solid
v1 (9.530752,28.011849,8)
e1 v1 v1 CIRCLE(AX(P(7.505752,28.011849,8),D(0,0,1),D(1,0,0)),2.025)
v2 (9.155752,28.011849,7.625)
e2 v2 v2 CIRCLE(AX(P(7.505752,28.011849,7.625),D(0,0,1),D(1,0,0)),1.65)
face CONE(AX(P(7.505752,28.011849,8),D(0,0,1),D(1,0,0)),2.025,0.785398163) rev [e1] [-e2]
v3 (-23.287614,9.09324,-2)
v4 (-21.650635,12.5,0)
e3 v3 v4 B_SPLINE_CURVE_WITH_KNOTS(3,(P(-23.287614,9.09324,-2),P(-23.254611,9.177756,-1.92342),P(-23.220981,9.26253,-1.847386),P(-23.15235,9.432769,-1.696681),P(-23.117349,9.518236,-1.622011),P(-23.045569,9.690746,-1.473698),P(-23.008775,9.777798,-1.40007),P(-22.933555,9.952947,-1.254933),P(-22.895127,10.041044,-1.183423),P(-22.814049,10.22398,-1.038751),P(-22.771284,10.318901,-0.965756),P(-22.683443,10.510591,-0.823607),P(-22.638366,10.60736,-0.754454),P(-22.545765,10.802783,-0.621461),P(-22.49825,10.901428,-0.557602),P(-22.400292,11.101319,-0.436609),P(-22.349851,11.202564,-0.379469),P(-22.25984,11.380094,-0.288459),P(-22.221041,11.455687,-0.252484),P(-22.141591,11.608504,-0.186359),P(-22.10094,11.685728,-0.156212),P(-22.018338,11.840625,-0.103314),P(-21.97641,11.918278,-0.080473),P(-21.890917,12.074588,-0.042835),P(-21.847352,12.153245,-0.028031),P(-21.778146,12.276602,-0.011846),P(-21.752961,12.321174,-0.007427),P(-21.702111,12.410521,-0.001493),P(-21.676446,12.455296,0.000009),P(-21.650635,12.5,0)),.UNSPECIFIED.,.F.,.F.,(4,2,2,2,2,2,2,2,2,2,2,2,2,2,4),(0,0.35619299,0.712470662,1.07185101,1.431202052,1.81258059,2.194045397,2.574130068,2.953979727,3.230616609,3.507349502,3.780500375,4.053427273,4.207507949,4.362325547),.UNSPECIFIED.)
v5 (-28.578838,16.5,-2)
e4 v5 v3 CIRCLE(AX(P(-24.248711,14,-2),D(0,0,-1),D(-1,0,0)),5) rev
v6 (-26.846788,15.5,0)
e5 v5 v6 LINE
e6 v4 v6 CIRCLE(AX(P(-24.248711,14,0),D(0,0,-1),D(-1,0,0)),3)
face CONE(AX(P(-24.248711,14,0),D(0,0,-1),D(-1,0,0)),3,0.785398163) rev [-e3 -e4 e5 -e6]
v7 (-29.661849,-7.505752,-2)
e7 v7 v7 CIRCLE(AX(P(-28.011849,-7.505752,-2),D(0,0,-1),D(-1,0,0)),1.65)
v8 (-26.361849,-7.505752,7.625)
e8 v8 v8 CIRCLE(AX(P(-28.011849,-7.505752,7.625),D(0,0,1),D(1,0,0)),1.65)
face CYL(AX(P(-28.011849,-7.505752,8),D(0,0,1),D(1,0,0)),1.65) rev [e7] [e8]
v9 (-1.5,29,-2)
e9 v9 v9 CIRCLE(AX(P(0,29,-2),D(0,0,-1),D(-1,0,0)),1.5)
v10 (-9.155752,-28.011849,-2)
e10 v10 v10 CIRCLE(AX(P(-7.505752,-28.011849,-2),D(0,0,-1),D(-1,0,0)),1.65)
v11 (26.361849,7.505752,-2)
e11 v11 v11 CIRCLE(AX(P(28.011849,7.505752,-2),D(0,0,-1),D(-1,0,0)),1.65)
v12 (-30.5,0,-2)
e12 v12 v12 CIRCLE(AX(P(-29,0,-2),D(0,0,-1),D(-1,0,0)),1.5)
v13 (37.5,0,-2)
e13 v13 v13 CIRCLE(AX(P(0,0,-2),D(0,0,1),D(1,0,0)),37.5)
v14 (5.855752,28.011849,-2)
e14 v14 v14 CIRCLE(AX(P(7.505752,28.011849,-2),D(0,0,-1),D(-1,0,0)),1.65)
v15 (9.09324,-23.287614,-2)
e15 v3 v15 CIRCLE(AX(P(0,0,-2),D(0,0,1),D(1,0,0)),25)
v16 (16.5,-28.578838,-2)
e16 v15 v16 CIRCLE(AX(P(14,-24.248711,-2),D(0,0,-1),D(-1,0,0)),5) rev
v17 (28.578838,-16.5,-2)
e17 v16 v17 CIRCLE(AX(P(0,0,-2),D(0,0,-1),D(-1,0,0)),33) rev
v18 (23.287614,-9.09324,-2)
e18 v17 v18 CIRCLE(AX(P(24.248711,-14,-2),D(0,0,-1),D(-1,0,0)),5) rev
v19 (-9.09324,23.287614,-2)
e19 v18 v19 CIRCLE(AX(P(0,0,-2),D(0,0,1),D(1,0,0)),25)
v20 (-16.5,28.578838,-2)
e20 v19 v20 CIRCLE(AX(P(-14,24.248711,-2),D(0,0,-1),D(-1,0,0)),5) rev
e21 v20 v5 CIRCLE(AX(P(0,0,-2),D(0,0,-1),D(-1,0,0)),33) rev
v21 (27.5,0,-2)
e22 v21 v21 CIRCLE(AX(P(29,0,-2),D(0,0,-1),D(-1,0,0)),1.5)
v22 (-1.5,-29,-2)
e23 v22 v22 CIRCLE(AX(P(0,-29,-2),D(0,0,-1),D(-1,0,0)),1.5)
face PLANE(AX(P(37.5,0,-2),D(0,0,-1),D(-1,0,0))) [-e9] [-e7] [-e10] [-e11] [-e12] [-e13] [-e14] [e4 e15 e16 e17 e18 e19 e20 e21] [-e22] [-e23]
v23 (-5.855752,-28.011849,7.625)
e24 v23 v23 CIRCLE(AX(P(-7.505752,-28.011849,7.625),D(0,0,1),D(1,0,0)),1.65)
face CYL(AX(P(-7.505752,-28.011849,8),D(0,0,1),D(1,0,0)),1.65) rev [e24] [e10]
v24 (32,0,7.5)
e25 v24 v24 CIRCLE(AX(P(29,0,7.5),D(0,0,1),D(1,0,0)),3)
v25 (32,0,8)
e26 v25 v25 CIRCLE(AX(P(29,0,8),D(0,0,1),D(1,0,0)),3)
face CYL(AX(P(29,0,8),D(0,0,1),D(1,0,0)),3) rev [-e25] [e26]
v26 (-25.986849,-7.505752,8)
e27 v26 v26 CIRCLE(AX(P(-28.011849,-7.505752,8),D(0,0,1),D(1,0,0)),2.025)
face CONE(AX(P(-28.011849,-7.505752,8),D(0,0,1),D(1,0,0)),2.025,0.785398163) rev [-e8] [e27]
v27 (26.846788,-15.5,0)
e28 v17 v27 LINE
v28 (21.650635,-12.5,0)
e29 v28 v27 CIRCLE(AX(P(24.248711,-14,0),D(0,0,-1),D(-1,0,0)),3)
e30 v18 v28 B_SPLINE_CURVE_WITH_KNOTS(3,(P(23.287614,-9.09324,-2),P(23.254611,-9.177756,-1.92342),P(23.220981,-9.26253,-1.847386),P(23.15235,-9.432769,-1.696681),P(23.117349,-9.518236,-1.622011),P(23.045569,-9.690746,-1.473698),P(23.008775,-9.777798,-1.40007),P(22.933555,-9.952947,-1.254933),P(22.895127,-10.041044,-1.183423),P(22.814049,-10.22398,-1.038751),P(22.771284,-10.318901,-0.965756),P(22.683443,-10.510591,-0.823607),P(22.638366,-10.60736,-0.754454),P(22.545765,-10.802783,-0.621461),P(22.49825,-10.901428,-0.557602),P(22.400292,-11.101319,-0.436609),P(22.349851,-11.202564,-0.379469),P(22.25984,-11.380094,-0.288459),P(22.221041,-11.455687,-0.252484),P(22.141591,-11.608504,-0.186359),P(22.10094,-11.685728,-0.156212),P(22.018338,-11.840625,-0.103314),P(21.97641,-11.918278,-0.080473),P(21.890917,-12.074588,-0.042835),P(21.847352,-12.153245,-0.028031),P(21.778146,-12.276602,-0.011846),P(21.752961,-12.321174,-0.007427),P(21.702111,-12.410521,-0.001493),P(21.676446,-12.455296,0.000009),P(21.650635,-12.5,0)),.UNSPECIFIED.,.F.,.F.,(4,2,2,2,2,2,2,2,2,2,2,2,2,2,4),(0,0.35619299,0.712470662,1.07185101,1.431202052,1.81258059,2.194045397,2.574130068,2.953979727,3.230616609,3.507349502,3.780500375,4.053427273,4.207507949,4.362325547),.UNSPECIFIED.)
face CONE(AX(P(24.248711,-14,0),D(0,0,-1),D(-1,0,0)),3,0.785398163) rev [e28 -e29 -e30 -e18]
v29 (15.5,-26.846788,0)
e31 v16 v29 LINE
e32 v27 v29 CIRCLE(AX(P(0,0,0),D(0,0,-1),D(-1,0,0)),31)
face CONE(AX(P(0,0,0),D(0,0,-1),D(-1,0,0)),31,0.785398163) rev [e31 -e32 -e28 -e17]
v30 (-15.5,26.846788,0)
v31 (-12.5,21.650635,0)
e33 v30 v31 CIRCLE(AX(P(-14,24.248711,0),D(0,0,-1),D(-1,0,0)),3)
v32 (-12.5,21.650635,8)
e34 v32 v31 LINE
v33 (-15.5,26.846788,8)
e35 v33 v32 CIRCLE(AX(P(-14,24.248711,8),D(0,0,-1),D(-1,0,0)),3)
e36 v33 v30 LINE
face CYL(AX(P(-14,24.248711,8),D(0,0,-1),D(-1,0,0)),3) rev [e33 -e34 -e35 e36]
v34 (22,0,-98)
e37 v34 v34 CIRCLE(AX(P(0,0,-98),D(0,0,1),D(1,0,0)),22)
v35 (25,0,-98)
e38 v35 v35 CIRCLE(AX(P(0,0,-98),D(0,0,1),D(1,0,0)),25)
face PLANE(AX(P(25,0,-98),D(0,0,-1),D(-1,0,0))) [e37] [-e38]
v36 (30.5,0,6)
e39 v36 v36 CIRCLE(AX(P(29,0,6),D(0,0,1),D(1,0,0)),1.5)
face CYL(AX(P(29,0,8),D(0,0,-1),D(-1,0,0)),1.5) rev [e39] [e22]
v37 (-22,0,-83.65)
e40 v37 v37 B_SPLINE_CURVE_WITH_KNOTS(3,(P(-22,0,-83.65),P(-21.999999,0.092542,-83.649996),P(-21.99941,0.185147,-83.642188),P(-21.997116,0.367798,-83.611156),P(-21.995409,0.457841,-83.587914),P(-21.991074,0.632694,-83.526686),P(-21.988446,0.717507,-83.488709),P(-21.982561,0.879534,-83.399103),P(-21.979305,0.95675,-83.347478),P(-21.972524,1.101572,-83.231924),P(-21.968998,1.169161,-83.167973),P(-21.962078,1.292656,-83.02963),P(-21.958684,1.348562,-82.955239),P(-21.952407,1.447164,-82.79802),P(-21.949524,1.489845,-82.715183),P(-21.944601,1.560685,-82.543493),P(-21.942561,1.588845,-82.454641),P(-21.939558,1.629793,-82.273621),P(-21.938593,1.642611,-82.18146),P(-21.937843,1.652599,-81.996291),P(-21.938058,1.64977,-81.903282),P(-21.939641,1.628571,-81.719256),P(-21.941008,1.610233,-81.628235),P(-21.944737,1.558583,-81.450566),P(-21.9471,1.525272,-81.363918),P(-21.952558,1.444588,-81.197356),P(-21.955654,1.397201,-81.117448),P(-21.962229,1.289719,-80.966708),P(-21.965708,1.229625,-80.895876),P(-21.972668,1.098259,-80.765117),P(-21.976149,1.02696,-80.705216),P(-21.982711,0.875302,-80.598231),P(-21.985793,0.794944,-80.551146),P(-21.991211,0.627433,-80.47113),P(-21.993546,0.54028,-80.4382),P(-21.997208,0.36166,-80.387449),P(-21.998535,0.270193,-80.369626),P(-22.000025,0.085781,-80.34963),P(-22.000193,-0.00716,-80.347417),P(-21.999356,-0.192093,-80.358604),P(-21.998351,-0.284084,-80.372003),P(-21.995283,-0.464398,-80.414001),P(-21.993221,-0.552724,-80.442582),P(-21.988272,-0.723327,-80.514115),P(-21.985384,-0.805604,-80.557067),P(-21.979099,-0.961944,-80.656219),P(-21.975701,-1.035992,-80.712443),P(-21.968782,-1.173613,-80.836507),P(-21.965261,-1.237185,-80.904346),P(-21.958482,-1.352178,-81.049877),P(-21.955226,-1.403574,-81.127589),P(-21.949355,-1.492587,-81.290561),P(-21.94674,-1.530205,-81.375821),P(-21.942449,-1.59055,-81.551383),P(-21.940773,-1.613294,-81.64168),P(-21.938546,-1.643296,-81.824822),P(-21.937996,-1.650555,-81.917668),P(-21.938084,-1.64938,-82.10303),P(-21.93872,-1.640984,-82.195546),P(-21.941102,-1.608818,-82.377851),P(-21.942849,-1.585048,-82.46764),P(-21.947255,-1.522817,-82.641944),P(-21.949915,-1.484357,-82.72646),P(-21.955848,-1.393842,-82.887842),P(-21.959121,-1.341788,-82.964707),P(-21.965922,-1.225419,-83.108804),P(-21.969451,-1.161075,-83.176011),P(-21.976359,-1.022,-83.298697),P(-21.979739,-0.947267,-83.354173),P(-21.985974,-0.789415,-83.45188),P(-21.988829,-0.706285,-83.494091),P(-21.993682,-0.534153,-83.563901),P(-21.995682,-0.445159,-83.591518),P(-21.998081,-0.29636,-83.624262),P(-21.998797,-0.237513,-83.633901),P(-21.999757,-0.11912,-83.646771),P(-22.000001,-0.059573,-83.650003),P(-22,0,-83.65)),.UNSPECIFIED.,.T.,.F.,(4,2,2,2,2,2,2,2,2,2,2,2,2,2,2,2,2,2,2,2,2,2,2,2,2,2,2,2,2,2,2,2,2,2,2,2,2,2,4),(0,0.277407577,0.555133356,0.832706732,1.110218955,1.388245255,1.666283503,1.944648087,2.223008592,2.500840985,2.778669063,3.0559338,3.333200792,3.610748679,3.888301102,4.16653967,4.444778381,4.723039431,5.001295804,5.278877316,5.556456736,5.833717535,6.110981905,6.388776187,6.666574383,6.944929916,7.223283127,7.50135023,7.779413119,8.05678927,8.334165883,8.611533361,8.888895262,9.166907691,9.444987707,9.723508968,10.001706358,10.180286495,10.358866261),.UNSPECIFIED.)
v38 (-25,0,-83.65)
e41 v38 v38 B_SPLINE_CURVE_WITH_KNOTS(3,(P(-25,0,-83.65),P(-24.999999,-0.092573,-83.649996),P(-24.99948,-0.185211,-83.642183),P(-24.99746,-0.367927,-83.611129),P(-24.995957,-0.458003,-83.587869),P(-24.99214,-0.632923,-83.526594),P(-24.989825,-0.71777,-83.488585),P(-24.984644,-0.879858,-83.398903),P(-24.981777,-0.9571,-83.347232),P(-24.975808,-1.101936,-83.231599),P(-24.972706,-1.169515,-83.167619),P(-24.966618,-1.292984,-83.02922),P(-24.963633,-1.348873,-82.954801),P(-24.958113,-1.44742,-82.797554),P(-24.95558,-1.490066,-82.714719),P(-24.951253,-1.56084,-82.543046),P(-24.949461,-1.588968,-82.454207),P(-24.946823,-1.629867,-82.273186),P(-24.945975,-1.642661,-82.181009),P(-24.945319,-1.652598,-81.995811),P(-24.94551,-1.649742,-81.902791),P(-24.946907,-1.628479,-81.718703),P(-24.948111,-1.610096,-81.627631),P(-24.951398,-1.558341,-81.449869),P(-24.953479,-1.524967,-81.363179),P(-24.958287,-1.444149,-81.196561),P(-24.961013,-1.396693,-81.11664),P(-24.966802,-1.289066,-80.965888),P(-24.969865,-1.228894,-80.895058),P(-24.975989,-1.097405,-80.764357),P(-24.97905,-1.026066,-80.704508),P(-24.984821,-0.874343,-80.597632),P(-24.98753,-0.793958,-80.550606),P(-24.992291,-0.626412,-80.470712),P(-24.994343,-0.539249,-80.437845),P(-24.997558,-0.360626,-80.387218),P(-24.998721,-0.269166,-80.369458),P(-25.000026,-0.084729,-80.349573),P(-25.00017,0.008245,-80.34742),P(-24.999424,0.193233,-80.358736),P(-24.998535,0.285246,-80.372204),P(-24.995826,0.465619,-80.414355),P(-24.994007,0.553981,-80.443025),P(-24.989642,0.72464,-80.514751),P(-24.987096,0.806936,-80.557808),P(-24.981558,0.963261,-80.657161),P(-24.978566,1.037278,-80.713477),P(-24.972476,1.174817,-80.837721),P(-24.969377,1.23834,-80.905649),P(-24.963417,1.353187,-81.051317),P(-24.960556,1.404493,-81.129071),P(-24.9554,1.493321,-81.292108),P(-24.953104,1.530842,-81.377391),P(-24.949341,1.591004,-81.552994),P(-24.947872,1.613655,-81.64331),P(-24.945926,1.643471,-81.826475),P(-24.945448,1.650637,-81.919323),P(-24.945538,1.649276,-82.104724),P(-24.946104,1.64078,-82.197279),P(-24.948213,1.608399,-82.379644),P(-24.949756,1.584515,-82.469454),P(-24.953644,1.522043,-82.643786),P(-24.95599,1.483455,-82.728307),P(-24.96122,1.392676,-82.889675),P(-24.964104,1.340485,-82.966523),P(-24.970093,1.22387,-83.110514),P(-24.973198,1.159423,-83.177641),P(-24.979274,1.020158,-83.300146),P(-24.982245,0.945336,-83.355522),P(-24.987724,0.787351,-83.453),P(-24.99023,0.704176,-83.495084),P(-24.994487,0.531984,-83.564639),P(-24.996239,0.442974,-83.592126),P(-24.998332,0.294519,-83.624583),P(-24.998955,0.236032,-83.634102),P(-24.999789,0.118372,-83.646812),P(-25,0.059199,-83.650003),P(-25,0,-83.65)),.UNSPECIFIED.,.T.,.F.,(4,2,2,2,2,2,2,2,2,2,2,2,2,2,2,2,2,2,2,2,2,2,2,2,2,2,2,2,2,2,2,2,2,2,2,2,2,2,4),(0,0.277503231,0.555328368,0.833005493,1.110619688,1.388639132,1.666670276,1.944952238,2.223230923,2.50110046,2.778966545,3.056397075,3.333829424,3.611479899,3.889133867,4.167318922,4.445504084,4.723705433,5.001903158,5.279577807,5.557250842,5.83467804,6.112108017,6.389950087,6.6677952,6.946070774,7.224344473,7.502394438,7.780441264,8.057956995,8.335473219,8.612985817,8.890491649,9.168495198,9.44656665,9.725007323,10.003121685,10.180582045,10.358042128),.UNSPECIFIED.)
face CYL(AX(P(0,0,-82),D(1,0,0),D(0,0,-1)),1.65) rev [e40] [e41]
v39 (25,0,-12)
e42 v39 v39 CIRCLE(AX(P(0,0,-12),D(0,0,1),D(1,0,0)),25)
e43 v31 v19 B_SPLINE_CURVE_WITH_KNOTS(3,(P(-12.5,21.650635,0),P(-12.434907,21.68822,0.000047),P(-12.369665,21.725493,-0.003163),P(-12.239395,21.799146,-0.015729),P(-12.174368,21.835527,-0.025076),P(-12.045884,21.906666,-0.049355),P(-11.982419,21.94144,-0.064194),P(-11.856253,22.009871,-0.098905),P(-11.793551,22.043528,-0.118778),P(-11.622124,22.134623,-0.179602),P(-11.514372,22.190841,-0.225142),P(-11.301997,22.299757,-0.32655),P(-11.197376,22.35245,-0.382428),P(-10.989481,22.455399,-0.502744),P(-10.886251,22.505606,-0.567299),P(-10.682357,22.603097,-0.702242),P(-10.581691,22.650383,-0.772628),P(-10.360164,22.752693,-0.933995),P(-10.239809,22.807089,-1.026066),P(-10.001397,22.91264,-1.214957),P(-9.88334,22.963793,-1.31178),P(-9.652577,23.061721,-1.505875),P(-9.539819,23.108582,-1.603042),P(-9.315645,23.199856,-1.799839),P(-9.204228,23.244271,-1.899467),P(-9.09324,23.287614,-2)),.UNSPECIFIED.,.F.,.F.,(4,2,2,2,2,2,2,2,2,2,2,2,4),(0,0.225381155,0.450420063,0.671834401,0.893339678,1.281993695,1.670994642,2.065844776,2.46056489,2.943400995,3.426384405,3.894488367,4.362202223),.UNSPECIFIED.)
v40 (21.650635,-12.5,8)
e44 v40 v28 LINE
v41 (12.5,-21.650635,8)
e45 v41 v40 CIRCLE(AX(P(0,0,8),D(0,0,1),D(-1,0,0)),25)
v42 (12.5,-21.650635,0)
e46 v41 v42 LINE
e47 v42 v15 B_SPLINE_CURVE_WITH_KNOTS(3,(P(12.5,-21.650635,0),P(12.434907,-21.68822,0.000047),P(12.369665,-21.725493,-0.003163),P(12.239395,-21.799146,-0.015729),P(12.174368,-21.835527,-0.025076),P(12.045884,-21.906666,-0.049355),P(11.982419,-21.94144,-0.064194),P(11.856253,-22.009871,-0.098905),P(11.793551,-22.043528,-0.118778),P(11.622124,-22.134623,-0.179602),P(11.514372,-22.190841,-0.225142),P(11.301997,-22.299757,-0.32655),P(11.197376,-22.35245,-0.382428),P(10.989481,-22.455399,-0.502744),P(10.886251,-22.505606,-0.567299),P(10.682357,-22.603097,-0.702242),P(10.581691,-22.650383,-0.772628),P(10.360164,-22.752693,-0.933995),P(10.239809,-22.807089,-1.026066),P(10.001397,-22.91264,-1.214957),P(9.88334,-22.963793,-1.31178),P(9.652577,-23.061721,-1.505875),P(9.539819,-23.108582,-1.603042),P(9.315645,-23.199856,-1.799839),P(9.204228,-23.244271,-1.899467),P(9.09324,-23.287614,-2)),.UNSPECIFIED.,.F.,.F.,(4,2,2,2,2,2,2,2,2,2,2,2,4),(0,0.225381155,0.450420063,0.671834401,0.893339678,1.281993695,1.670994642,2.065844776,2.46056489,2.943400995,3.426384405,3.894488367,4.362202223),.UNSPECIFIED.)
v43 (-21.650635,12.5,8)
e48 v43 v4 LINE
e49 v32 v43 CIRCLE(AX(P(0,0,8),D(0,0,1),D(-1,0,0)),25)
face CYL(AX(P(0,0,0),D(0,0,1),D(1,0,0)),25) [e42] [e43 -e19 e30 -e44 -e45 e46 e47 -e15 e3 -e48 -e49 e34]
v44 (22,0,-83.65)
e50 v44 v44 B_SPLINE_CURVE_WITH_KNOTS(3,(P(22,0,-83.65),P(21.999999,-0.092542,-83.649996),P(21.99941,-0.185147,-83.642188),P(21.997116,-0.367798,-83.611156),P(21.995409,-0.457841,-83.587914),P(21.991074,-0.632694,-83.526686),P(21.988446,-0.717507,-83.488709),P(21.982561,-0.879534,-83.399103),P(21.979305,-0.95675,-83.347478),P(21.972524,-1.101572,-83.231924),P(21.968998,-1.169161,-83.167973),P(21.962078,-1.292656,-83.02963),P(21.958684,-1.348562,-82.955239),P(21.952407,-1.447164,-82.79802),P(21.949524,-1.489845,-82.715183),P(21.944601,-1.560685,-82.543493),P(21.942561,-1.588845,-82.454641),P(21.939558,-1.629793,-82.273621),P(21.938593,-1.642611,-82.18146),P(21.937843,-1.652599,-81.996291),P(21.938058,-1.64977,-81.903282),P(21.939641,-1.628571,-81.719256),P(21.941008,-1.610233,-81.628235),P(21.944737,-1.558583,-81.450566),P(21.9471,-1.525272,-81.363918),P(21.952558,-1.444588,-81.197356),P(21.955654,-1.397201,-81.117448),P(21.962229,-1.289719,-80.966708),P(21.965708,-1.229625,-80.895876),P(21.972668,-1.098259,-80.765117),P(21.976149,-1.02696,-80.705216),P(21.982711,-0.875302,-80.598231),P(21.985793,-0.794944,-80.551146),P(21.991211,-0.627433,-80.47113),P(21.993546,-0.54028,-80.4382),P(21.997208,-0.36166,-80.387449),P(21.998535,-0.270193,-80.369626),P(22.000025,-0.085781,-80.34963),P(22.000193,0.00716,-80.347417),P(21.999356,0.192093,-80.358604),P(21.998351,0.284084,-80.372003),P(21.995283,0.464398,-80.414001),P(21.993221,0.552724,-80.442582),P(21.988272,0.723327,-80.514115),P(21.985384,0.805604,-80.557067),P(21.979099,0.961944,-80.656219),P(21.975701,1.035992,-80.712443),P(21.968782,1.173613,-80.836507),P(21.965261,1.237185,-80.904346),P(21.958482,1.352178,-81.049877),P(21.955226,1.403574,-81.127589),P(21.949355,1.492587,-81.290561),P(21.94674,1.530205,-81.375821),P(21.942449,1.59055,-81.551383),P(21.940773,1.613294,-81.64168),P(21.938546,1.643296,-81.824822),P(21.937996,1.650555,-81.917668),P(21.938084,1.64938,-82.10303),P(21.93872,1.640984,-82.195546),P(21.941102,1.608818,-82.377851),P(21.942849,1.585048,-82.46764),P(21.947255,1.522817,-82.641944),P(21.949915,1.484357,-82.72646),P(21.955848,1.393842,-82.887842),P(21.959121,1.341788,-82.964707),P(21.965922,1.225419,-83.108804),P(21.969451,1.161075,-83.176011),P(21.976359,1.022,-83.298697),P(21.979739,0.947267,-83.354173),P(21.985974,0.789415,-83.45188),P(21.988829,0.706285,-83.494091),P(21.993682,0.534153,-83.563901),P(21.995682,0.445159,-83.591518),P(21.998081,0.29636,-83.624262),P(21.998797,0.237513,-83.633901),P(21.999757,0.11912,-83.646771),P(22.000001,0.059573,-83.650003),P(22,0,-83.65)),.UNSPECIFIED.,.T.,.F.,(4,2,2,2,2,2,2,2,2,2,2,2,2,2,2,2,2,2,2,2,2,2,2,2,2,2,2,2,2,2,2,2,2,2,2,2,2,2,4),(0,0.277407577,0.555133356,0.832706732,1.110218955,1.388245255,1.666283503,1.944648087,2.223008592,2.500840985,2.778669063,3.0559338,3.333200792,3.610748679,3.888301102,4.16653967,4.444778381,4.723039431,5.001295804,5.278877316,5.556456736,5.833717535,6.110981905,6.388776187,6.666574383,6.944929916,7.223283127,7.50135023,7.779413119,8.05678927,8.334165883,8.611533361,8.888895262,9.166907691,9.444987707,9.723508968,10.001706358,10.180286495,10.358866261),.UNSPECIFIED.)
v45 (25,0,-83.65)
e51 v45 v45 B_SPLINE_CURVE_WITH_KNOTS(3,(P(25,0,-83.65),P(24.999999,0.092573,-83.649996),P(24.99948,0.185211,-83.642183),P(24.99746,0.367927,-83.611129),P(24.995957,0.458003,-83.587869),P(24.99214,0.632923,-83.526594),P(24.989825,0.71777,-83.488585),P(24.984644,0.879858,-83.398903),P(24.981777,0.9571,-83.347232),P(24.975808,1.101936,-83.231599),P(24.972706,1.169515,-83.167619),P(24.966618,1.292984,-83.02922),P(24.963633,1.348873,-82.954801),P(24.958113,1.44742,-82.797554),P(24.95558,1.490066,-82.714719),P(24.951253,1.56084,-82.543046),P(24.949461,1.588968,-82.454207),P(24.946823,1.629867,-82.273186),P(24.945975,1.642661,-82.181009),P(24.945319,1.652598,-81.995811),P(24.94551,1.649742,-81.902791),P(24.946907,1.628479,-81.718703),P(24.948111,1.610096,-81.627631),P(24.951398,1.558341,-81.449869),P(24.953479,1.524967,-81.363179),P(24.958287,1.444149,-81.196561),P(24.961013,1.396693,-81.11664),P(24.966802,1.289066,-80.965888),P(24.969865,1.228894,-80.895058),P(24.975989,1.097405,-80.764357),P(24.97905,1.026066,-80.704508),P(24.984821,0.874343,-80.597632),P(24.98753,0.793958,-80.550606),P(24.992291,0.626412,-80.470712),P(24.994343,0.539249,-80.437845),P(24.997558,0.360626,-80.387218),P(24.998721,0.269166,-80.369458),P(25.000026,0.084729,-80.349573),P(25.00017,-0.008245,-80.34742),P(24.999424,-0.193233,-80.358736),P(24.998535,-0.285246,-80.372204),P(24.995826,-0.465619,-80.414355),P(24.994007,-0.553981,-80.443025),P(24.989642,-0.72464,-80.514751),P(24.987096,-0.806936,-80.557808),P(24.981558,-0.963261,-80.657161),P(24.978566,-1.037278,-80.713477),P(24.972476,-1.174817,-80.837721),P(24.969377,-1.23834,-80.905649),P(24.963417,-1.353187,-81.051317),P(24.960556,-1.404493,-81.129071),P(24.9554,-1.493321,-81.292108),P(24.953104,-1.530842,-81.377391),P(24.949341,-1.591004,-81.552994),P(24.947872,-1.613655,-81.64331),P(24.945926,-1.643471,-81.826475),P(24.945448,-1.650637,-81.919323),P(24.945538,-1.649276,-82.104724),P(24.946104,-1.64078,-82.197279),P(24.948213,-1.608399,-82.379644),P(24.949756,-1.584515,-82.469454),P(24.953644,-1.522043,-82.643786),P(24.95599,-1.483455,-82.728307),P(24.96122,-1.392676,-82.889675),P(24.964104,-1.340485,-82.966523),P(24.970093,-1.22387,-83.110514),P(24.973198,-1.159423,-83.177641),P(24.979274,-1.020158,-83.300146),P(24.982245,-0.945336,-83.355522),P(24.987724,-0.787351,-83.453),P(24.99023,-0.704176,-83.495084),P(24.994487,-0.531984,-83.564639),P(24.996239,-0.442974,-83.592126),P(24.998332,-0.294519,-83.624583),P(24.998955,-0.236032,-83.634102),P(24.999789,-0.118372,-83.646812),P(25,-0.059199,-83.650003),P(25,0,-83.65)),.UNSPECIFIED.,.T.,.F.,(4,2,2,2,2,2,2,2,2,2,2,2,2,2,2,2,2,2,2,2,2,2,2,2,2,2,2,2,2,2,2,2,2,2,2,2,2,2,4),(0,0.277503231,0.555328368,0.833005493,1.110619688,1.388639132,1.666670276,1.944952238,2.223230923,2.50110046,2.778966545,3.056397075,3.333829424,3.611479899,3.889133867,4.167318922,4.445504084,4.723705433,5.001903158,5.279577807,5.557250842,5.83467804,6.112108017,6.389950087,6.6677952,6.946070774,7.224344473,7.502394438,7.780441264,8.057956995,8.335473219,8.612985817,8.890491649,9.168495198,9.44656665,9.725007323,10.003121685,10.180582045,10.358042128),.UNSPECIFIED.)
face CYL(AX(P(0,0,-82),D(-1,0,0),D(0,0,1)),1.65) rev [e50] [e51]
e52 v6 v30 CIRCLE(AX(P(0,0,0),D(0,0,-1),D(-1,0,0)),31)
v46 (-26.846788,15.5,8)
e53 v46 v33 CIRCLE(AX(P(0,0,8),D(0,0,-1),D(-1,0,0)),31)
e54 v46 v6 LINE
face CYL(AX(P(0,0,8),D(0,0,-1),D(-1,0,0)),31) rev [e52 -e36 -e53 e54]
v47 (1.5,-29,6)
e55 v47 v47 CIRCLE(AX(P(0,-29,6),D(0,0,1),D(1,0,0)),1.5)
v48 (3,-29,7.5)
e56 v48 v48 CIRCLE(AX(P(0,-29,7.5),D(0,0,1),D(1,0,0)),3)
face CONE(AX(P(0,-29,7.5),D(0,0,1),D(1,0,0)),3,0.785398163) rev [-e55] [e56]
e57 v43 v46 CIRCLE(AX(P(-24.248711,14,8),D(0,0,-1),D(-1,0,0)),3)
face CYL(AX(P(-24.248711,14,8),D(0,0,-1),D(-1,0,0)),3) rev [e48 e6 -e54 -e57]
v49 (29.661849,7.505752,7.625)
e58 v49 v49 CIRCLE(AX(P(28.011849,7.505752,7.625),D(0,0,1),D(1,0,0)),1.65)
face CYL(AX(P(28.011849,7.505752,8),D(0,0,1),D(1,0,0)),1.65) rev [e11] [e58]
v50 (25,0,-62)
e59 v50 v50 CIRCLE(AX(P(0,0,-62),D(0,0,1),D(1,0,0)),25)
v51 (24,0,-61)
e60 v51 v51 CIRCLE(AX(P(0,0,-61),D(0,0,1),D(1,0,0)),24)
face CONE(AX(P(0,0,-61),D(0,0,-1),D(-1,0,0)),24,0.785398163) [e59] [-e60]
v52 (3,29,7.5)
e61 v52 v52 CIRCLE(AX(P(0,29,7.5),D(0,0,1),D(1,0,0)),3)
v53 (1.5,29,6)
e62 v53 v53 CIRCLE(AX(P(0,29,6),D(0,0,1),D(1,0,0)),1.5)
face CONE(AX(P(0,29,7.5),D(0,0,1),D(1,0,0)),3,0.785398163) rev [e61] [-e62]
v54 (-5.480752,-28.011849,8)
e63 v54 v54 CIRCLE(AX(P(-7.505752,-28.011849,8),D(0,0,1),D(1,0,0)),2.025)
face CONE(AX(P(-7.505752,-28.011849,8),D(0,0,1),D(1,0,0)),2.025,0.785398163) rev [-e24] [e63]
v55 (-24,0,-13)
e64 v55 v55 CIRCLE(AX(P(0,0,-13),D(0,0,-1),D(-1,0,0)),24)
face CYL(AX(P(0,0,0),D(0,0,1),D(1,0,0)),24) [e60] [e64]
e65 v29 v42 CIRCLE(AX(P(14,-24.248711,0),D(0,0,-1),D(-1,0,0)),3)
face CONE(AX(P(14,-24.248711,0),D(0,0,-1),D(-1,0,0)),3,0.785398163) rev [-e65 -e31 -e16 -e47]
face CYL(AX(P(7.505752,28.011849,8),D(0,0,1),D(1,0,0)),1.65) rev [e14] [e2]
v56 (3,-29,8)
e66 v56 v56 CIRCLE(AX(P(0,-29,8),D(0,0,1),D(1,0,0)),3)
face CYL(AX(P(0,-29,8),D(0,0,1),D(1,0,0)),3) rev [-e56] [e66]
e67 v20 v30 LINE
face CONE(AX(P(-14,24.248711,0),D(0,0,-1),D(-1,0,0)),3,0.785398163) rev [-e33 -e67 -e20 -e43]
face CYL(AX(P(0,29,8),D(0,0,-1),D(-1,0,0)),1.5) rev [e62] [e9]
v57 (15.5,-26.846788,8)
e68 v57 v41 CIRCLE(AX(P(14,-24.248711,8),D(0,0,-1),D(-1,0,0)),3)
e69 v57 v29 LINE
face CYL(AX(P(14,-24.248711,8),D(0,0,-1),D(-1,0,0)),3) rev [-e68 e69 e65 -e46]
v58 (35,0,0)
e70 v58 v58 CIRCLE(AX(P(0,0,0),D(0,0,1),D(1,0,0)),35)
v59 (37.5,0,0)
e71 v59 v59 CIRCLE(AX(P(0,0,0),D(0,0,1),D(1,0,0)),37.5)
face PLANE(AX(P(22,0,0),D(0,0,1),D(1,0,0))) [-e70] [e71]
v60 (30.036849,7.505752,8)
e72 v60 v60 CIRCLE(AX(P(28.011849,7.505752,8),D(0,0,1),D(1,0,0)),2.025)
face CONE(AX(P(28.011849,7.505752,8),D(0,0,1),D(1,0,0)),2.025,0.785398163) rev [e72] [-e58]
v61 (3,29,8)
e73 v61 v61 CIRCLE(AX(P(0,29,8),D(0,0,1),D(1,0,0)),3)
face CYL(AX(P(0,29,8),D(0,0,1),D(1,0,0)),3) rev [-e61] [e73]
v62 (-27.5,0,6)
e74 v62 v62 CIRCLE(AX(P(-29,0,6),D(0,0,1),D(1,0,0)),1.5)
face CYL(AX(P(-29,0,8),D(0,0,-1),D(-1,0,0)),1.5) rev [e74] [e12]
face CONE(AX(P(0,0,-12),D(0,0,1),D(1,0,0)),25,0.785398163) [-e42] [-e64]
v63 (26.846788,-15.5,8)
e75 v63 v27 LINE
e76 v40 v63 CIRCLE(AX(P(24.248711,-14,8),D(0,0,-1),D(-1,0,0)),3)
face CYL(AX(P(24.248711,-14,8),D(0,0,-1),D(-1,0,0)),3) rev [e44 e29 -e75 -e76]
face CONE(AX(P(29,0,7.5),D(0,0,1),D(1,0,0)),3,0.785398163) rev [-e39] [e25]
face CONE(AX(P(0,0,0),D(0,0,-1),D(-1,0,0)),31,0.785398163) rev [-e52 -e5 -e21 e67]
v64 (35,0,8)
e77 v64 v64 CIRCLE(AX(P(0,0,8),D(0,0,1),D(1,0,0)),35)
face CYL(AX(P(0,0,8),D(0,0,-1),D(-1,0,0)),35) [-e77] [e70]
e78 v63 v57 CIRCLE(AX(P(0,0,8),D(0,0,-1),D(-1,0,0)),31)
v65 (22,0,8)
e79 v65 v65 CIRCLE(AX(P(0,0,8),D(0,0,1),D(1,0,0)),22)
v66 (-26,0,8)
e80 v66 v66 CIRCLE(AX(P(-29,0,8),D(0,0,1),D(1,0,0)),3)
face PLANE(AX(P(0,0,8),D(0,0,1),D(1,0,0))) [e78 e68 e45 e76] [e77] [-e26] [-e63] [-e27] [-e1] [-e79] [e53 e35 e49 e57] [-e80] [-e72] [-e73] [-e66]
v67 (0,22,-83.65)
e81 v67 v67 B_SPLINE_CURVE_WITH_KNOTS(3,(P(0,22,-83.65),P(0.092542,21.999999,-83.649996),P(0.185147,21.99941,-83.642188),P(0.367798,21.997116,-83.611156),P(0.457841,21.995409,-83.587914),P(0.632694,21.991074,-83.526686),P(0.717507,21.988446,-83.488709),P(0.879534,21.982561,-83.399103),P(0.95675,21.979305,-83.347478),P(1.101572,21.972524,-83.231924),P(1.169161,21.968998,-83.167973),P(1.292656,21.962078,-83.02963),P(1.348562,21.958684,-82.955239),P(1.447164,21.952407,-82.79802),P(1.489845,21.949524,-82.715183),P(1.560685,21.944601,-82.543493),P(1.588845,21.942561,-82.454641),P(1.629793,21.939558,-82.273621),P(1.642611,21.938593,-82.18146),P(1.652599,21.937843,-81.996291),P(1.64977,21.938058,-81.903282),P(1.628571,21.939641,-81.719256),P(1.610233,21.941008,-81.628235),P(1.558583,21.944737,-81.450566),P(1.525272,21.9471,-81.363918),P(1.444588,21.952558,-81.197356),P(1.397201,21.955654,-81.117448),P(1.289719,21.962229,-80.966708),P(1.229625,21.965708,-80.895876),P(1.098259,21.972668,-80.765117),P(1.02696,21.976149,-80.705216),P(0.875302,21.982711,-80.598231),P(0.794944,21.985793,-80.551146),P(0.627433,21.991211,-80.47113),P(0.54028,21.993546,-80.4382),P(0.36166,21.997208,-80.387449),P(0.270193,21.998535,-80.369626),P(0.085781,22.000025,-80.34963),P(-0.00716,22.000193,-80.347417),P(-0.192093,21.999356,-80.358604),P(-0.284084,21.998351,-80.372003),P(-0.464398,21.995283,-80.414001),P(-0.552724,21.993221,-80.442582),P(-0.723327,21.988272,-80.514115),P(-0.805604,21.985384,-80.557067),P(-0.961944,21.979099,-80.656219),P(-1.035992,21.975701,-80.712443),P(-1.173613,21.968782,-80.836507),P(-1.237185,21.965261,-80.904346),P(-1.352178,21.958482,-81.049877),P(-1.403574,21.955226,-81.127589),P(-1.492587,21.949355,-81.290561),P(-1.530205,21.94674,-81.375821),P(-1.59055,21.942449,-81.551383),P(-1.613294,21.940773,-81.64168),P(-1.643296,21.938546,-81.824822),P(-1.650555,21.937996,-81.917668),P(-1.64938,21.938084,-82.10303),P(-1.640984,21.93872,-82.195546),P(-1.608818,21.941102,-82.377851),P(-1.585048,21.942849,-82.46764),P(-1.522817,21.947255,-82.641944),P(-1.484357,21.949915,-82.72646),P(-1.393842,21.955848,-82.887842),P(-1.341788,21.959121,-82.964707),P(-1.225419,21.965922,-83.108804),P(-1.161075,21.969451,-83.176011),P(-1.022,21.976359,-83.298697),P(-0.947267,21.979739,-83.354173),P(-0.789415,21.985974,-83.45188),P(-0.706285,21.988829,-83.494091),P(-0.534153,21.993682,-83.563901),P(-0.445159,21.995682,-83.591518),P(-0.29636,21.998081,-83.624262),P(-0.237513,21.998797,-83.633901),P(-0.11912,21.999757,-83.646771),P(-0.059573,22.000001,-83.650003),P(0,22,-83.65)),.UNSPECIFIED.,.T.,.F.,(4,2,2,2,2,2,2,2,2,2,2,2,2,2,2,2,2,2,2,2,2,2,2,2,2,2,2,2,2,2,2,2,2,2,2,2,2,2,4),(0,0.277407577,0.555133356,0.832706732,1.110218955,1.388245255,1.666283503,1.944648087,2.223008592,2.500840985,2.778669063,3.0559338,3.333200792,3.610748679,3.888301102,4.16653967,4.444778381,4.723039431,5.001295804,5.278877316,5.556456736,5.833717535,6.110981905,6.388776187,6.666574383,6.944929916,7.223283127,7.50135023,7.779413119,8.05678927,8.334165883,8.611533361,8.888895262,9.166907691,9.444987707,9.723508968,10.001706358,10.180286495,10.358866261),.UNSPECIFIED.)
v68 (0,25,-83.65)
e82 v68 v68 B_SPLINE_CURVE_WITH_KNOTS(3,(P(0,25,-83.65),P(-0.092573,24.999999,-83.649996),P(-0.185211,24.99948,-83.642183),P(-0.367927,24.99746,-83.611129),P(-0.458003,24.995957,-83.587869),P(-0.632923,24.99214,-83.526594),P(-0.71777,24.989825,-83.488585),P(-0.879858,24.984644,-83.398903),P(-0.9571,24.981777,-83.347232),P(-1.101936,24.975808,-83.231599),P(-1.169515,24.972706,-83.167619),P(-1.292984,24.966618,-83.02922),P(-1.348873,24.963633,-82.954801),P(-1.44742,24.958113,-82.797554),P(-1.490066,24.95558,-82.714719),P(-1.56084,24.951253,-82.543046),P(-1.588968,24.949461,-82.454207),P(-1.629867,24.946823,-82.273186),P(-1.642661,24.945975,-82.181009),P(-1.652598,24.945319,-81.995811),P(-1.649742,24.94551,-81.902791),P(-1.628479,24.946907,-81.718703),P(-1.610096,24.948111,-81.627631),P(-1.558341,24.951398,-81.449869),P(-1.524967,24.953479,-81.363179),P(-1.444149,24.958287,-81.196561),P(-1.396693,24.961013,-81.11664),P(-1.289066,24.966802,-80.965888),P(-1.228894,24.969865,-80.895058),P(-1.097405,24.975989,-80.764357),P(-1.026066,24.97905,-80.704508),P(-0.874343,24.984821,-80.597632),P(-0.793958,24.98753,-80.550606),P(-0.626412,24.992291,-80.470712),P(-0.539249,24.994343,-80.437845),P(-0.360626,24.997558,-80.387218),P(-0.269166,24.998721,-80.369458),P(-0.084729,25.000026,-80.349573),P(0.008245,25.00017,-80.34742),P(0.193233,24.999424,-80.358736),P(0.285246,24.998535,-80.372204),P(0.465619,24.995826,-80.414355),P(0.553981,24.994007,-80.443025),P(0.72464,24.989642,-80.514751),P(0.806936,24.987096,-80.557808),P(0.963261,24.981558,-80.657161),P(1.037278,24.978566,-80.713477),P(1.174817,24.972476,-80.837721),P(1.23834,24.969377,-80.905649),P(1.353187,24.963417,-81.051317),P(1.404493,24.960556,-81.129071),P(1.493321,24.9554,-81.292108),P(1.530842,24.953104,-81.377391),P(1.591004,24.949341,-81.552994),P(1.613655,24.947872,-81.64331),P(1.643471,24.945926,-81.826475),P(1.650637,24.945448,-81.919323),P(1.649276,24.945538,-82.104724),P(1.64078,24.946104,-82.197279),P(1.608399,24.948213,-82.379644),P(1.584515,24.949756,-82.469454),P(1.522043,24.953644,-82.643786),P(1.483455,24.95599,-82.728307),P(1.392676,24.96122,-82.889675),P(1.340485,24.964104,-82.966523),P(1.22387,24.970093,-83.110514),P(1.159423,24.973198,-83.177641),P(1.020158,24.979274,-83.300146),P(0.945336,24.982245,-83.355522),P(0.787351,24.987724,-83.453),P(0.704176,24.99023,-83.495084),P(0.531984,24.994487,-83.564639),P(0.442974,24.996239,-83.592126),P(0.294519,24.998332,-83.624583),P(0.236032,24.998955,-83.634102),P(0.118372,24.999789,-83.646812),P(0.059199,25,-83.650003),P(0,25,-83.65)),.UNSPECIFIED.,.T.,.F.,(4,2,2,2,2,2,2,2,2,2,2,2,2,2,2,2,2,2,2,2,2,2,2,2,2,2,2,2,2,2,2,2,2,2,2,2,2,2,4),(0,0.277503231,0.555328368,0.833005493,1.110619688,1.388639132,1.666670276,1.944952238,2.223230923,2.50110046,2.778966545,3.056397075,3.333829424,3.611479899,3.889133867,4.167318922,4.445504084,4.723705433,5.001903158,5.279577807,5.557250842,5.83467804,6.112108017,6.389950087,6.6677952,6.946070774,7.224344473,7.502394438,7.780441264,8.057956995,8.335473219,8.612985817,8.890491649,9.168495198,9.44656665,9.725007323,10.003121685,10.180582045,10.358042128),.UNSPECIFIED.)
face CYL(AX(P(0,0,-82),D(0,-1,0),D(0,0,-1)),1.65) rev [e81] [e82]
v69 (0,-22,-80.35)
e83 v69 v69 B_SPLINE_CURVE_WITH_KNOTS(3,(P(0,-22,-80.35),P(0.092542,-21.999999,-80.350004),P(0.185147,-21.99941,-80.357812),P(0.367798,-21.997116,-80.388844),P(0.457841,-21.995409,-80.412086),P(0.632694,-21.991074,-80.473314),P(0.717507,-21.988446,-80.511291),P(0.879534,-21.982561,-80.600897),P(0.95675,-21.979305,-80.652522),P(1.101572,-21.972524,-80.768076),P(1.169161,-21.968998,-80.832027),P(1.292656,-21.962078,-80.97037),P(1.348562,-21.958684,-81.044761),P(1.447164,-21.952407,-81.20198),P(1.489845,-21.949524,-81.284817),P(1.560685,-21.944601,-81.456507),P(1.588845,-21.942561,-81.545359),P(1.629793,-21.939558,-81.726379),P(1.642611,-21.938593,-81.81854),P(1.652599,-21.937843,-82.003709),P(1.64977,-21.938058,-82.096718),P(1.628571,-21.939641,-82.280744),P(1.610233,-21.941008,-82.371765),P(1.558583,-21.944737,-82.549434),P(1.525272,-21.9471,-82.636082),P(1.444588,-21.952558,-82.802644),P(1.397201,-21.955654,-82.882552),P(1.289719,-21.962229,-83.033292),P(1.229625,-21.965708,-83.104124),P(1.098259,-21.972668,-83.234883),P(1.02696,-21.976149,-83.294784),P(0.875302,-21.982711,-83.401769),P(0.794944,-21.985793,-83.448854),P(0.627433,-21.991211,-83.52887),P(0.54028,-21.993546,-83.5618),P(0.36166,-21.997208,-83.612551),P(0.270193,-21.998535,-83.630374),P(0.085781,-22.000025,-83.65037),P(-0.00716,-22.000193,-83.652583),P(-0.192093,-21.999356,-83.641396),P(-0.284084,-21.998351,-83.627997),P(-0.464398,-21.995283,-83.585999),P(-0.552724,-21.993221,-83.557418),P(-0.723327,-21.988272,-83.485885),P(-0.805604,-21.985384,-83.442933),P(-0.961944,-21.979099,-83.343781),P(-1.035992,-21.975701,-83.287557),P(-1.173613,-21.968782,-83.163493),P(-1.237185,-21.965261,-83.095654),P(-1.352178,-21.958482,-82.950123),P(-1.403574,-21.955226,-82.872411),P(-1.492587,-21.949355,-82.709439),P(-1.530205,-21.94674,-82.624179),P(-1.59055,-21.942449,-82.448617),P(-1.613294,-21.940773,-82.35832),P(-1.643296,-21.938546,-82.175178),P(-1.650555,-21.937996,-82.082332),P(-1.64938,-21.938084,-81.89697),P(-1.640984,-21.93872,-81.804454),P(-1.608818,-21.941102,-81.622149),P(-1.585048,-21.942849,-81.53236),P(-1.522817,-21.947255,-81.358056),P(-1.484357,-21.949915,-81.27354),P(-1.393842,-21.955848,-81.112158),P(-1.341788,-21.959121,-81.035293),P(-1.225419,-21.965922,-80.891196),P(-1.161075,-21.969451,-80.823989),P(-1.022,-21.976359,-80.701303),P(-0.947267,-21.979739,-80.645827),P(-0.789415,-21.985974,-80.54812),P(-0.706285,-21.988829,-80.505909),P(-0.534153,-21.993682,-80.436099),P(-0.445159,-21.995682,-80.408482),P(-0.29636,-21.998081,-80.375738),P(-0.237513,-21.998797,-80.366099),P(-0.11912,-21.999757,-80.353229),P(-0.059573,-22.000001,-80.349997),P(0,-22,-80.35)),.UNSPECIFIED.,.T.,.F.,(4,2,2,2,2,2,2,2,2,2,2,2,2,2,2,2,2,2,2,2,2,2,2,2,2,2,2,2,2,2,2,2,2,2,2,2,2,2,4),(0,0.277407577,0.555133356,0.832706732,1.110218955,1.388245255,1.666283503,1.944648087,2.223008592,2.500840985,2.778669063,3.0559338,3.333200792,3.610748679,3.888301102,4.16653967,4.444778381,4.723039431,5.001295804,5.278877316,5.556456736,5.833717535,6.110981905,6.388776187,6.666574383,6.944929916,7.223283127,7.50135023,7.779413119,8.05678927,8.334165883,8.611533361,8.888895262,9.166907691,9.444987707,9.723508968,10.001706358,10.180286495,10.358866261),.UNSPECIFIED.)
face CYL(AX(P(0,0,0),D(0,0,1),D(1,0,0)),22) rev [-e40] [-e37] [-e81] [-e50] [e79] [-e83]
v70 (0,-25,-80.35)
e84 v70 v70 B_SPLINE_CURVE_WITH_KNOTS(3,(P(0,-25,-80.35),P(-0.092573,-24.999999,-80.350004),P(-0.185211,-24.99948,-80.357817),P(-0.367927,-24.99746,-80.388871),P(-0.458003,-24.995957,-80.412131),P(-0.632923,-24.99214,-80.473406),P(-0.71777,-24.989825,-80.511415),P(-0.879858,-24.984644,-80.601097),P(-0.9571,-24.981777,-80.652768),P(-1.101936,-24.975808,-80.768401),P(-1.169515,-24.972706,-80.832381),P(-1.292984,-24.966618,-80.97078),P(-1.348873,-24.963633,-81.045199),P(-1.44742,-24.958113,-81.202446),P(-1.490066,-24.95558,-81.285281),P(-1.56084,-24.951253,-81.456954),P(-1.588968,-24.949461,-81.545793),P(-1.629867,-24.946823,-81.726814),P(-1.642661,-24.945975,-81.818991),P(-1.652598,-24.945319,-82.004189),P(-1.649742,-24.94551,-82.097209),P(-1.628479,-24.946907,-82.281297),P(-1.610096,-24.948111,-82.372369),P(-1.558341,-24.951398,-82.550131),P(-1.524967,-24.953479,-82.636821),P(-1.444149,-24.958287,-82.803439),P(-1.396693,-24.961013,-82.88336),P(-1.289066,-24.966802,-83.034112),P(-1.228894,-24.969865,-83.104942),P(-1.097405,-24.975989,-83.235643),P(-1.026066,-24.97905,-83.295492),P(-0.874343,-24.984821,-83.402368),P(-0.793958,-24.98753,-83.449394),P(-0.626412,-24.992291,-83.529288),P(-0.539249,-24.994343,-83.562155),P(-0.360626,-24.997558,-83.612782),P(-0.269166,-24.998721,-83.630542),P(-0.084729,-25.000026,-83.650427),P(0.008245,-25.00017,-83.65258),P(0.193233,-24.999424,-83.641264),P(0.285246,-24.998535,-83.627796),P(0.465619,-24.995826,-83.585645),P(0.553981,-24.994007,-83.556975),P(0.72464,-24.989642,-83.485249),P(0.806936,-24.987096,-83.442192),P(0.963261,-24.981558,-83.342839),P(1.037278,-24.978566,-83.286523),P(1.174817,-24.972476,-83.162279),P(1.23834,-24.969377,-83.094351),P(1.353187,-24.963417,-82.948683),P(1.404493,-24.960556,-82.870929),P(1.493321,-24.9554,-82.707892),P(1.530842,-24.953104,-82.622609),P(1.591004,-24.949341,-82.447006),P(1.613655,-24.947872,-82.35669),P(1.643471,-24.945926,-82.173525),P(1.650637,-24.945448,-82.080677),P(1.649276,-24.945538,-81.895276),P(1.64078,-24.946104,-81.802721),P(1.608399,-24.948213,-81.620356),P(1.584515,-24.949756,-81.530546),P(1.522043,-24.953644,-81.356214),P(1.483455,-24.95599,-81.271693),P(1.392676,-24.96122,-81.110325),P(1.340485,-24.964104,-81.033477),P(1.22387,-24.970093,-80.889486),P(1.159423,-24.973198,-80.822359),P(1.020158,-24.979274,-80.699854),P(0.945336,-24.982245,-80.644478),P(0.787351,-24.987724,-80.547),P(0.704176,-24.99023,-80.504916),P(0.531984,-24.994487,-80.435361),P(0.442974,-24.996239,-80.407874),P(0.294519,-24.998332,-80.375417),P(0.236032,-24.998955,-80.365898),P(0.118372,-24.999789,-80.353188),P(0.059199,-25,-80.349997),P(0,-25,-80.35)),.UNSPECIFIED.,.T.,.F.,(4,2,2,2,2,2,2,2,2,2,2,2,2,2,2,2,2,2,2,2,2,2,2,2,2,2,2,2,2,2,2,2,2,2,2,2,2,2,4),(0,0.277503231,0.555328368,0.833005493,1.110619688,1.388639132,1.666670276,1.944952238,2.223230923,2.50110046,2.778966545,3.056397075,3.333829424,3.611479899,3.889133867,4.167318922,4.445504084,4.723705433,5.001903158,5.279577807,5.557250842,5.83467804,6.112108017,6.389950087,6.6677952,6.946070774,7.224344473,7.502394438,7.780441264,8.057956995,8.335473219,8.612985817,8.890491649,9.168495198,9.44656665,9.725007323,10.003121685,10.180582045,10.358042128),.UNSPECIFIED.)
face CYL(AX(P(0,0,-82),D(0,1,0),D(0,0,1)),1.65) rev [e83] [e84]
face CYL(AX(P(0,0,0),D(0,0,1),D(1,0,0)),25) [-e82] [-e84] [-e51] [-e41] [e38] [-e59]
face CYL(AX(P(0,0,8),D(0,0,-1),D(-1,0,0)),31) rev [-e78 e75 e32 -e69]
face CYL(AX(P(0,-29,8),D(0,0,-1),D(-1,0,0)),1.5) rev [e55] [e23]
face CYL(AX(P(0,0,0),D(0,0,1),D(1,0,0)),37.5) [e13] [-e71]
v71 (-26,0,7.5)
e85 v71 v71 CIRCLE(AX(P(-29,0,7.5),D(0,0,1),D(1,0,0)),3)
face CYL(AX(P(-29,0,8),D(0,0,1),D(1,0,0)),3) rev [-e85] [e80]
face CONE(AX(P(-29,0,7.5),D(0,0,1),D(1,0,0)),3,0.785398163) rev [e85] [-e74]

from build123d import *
from build123d.topology import SkipClean

# Parameters (mm, degrees)
EXTRUDE_START                = 8
SKETCH_5_R                   = 35
SKETCH_5_R_2                 = 22
EXTRUDE_1_DEPTH              = 8
SKETCH_9_W                   = 1.65
SKETCH_9_H                   = 37.5
SKETCH_2_R                   = 1.5
CUT_EXTRUDE_1_DEPTH          = 110.674519
PATTERN_CIRCULAR_1_COUNT     = 4
HOLE_WIZARD_M4_4_D           = 3.3
HOLE_WIZARD_M4_4_CSINK_D     = 4.05
HOLE_WIZARD_M4_4_CSINK_ANGLE = 90
HOLE_WIZARD_1_AT_2_COUNT     = 2
HOLE_WIZARD_1_AT_2_PITCH     = 41.012193
HOLE_WIZARD_1_AT_3_COUNT     = 2
HOLE_WIZARD_1_AT_3_PITCH     = 58
HOLE_WIZARD_1_AT_4_COUNT     = 2
HOLE_WIZARD_1_AT_4_PITCH     = 41.012193
CHAMFER_1_SIZE               = 2
CHAMFER_2_SIZE               = 1


# Some blends are built 0.0001 mm under size
with BuildPart() as part:
    # 草图1 → 旋转1 (revolve)
    with BuildSketch(Plane(origin=(0, 0, 0), x_dir=(1, 0, 0), z_dir=(0, 1, 0))):
        Polygon((37.5, 0), (37.5, 2), (25, 2), (25, 12), (24, 12), (24, 62), (25, 62), (25, 98), (22, 98), (22, 0), align=None)
    revolve(axis=Axis((0, 0, 0), (0, 0, -1)))

    # 草图5 → 凸台-拉伸1 (add)
    with BuildSketch(Plane.XY.offset(EXTRUDE_START)):
        Circle(SKETCH_5_R)
        Circle(SKETCH_5_R_2, mode=Mode.SUBTRACT)
    extrude(amount=-EXTRUDE_1_DEPTH)

    # 草图9 → M4 螺纹孔2 (revolve, cut)
    with BuildSketch(Plane(origin=(0, 0, -82), x_dir=(0, 0, -1), z_dir=(1, 0, 0))):
        with Locations((0.825, 18.75)):
            Rectangle(SKETCH_9_W, SKETCH_9_H)
    hole_wizard_m4_2 = revolve(axis=Axis((0, -6.35, -82), (0, 1, 0)), mode=Mode.SUBTRACT)

    # 草图2 → 切除-拉伸1 (cut, through all)
    with SkipClean():  # the faces are left unmerged after this step: merging them gives an invalid solid
        with BuildSketch(Plane(origin=(0, 0, -2), x_dir=(-1, 0, 0), z_dir=(0, 0, -1))):
            with Locations((0, 29)):
                Circle(SKETCH_2_R)
            with Locations((29, 0)):
                Circle(SKETCH_2_R)
            with Locations((0, -29)):
                Circle(SKETCH_2_R)
            with Locations((-29, 0)):
                Circle(SKETCH_2_R)
            with BuildLine():
                ThreePointArc((26.846788, 15.5), (21.92031, 21.92031), (15.5, 26.846788))
                ThreePointArc((15.5, 26.846788), (11.401924, 25.748711), (12.5, 21.650635))
                ThreePointArc((12.5, 21.650635), (17.67767, 17.67767), (21.650635, 12.5))
                ThreePointArc((21.650635, 12.5), (25.748711, 11.401924), (26.846788, 15.5))
            make_face()
            with BuildLine():
                ThreePointArc((-26.846788, -15.5), (-21.92031, -21.92031), (-15.5, -26.846788))
                ThreePointArc((-15.5, -26.846788), (-11.401924, -25.748711), (-12.5, -21.650635))
                ThreePointArc((-12.5, -21.650635), (-17.67767, -17.67767), (-21.650635, -12.5))
                ThreePointArc((-21.650635, -12.5), (-25.748711, -11.401924), (-26.846788, -15.5))
            make_face()
        extrude(amount=-CUT_EXTRUDE_1_DEPTH, mode=Mode.SUBTRACT)

    # 阵列(圆周)1: M4 螺纹孔2 ×4 about axis
    with SkipClean():  # the faces are left unmerged after this step: merging them gives an invalid solid
        pattern_circular_1_axis = Axis((0, 0, 0), (0, 0, -1))
        for i in range(1, PATTERN_CIRCULAR_1_COUNT):
            add(hole_wizard_m4_2.rotate(pattern_circular_1_axis, i * 360 / PATTERN_CIRCULAR_1_COUNT), mode=Mode.SUBTRACT)

    # M4 螺纹孔4 (through all)
    with Locations(Plane.XY.offset(8)):
        with Locations((7.505752, 28.011849), (28.011849, 7.505752), (-7.505752, -28.011849), (-28.011849, -7.505752)):
            CounterSinkHole(HOLE_WIZARD_M4_4_D / 2, HOLE_WIZARD_M4_4_CSINK_D / 2, counter_sink_angle=HOLE_WIZARD_M4_4_CSINK_ANGLE)

    # 草图15 → 孔1 (revolve, cut)
    with SkipClean():  # the faces are left unmerged after this step: merging them gives an invalid solid
        with BuildSketch(Plane(origin=(-29, 0, 8), x_dir=(0, -1, 0), z_dir=(1, 0, 0))):
            Polygon((0, 0), (0, 106), (1.5, 106), (1.5, 2), (3, 0.5), (3, 0), align=None)
        hole_wizard_1 = revolve(axis=Axis((-29, 0, 14.130024), (0, 0, -1)), mode=Mode.SUBTRACT)

    # 孔1 at 2: 孔1 ×2
    with SkipClean():  # the faces are left unmerged after this step: merging them gives an invalid solid
        with Locations(*[Vector(0.7071067811865532, -0.7071067811865418, 0) * (i * HOLE_WIZARD_1_AT_2_PITCH) for i in range(1, HOLE_WIZARD_1_AT_2_COUNT)]):
            add(hole_wizard_1, mode=Mode.SUBTRACT)

    # 孔1 at 3: 孔1 ×2
    with SkipClean():  # the faces are left unmerged after this step: merging them gives an invalid solid
        with Locations(*[(i * HOLE_WIZARD_1_AT_3_PITCH, 0, 0) for i in range(1, HOLE_WIZARD_1_AT_3_COUNT)]):
            add(hole_wizard_1, mode=Mode.SUBTRACT)

    # 孔1 at 4: 孔1 ×2
    with SkipClean():  # the faces are left unmerged after this step: merging them gives an invalid solid
        with Locations(*[Vector(0.7071067811865457, 0.7071067811865495, 0) * (i * HOLE_WIZARD_1_AT_4_PITCH) for i in range(1, HOLE_WIZARD_1_AT_4_COUNT)]):
            add(hole_wizard_1, mode=Mode.SUBTRACT)

    # 倒角1
    # the kernel refuses this chamfer: 2 mm, written as the material it takes off along each edge
    with BuildSketch(Plane(origin=(24.248711, -14, -2), x_dir=(-0.3683025891242999, -0.9297059765562106, 0), z_dir=(0.9297059765562106, -0.3683025891242999, 0))) as chamfer_1_piece_1_section:
        Polygon((3 + CHAMFER_1_SIZE, 0), (3, -CHAMFER_1_SIZE), (3, 0), align=None)
    chamfer_1_piece_1 = revolve(axis=Axis((24.248711, -14, -2), (0, 0, -1)), revolution_arc=278.389028, mode=Mode.PRIVATE)
    chamfer_1_piece_1 = chamfer_1_piece_1 - Plane(origin=(0, 0, -1.316198), x_dir=(1, 0, 0), z_dir=(0, 0, -1)) * Cylinder(25, 21, mode=Mode.PRIVATE)
    add(chamfer_1_piece_1, mode=Mode.SUBTRACT)
    with BuildSketch(Plane(origin=(0, 0, -2), x_dir=(0.866025403784439, -0.49999999999999944, 0), z_dir=(0.49999999999999944, 0.866025403784439, 0))) as chamfer_1_piece_2:
        Polygon((31 + CHAMFER_1_SIZE, 0), (31, -CHAMFER_1_SIZE), (31, 0), align=None)
    revolve(axis=Axis((0, 0, -2), (0, 0, -1)), revolution_arc=30, mode=Mode.SUBTRACT)
    with BuildSketch(Plane(origin=(14, -24.248711, -2), x_dir=(0.5, -0.8660254037844387, 0), z_dir=(0.8660254037844387, 0.5, 0))) as chamfer_1_piece_3_section:
        Polygon((3 + CHAMFER_1_SIZE, 0), (3, -CHAMFER_1_SIZE), (3, 0), align=None)
    chamfer_1_piece_3 = revolve(axis=Axis((14, -24.248711, -2), (0, 0, -1)), revolution_arc=278.389028, mode=Mode.PRIVATE)
    chamfer_1_piece_3 = chamfer_1_piece_3 - Plane(origin=(0, 0, -1.445844), x_dir=(1, 0, 0), z_dir=(0, 0, -1)) * Cylinder(25, 21, mode=Mode.PRIVATE)
    add(chamfer_1_piece_3, mode=Mode.SUBTRACT)
    with BuildSketch(Plane(origin=(-24.248711, 14, -2), x_dir=(0.368302589124304, 0.9297059765562089, 0), z_dir=(-0.9297059765562089, 0.368302589124304, 0))) as chamfer_1_piece_4_section:
        Polygon((3 + CHAMFER_1_SIZE, 0), (3, -CHAMFER_1_SIZE), (3, 0), align=None)
    chamfer_1_piece_4 = revolve(axis=Axis((-24.248711, 14, -2), (0, 0, -1)), revolution_arc=278.389028, mode=Mode.PRIVATE)
    chamfer_1_piece_4 = chamfer_1_piece_4 - Plane(origin=(0, 0, -1.316197), x_dir=(1, 0, 0), z_dir=(0, 0, -1)) * Cylinder(25, 21, mode=Mode.PRIVATE)
    add(chamfer_1_piece_4, mode=Mode.SUBTRACT)
    with BuildSketch(Plane(origin=(0, 0, -2), x_dir=(-0.8660254037844394, 0.4999999999999989, 0), z_dir=(-0.4999999999999989, -0.8660254037844394, 0))) as chamfer_1_piece_5:
        Polygon((31 + CHAMFER_1_SIZE, 0), (31, -CHAMFER_1_SIZE), (31, 0), align=None)
    revolve(axis=Axis((0, 0, -2), (0, 0, -1)), revolution_arc=30, mode=Mode.SUBTRACT)
    with BuildSketch(Plane(origin=(-14, 24.248711, -2), x_dir=(-0.5000000000000014, 0.8660254037844378, 0), z_dir=(-0.8660254037844378, -0.5000000000000014, 0))) as chamfer_1_piece_6_section:
        Polygon((3 + CHAMFER_1_SIZE, 0), (3, -CHAMFER_1_SIZE), (3, 0), align=None)
    chamfer_1_piece_6 = revolve(axis=Axis((-14, 24.248711, -2), (0, 0, -1)), revolution_arc=278.389028, mode=Mode.PRIVATE)
    chamfer_1_piece_6 = chamfer_1_piece_6 - Plane(origin=(0, 0, -1.445844), x_dir=(1, 0, 0), z_dir=(0, 0, -1)) * Cylinder(25, 20, mode=Mode.PRIVATE)
    add(chamfer_1_piece_6, mode=Mode.SUBTRACT)

    # 倒角2
    chamfer_2_edges = [part.edges().sort_by_distance(p)[0] for p in [
        (-24, 0, -62),
        (-24, 0, -12),
    ]]
    chamfer(chamfer_2_edges, length=CHAMFER_2_SIZE - 0.0001)  # a hair under: the kernel refuses the full size


solid = part.part
